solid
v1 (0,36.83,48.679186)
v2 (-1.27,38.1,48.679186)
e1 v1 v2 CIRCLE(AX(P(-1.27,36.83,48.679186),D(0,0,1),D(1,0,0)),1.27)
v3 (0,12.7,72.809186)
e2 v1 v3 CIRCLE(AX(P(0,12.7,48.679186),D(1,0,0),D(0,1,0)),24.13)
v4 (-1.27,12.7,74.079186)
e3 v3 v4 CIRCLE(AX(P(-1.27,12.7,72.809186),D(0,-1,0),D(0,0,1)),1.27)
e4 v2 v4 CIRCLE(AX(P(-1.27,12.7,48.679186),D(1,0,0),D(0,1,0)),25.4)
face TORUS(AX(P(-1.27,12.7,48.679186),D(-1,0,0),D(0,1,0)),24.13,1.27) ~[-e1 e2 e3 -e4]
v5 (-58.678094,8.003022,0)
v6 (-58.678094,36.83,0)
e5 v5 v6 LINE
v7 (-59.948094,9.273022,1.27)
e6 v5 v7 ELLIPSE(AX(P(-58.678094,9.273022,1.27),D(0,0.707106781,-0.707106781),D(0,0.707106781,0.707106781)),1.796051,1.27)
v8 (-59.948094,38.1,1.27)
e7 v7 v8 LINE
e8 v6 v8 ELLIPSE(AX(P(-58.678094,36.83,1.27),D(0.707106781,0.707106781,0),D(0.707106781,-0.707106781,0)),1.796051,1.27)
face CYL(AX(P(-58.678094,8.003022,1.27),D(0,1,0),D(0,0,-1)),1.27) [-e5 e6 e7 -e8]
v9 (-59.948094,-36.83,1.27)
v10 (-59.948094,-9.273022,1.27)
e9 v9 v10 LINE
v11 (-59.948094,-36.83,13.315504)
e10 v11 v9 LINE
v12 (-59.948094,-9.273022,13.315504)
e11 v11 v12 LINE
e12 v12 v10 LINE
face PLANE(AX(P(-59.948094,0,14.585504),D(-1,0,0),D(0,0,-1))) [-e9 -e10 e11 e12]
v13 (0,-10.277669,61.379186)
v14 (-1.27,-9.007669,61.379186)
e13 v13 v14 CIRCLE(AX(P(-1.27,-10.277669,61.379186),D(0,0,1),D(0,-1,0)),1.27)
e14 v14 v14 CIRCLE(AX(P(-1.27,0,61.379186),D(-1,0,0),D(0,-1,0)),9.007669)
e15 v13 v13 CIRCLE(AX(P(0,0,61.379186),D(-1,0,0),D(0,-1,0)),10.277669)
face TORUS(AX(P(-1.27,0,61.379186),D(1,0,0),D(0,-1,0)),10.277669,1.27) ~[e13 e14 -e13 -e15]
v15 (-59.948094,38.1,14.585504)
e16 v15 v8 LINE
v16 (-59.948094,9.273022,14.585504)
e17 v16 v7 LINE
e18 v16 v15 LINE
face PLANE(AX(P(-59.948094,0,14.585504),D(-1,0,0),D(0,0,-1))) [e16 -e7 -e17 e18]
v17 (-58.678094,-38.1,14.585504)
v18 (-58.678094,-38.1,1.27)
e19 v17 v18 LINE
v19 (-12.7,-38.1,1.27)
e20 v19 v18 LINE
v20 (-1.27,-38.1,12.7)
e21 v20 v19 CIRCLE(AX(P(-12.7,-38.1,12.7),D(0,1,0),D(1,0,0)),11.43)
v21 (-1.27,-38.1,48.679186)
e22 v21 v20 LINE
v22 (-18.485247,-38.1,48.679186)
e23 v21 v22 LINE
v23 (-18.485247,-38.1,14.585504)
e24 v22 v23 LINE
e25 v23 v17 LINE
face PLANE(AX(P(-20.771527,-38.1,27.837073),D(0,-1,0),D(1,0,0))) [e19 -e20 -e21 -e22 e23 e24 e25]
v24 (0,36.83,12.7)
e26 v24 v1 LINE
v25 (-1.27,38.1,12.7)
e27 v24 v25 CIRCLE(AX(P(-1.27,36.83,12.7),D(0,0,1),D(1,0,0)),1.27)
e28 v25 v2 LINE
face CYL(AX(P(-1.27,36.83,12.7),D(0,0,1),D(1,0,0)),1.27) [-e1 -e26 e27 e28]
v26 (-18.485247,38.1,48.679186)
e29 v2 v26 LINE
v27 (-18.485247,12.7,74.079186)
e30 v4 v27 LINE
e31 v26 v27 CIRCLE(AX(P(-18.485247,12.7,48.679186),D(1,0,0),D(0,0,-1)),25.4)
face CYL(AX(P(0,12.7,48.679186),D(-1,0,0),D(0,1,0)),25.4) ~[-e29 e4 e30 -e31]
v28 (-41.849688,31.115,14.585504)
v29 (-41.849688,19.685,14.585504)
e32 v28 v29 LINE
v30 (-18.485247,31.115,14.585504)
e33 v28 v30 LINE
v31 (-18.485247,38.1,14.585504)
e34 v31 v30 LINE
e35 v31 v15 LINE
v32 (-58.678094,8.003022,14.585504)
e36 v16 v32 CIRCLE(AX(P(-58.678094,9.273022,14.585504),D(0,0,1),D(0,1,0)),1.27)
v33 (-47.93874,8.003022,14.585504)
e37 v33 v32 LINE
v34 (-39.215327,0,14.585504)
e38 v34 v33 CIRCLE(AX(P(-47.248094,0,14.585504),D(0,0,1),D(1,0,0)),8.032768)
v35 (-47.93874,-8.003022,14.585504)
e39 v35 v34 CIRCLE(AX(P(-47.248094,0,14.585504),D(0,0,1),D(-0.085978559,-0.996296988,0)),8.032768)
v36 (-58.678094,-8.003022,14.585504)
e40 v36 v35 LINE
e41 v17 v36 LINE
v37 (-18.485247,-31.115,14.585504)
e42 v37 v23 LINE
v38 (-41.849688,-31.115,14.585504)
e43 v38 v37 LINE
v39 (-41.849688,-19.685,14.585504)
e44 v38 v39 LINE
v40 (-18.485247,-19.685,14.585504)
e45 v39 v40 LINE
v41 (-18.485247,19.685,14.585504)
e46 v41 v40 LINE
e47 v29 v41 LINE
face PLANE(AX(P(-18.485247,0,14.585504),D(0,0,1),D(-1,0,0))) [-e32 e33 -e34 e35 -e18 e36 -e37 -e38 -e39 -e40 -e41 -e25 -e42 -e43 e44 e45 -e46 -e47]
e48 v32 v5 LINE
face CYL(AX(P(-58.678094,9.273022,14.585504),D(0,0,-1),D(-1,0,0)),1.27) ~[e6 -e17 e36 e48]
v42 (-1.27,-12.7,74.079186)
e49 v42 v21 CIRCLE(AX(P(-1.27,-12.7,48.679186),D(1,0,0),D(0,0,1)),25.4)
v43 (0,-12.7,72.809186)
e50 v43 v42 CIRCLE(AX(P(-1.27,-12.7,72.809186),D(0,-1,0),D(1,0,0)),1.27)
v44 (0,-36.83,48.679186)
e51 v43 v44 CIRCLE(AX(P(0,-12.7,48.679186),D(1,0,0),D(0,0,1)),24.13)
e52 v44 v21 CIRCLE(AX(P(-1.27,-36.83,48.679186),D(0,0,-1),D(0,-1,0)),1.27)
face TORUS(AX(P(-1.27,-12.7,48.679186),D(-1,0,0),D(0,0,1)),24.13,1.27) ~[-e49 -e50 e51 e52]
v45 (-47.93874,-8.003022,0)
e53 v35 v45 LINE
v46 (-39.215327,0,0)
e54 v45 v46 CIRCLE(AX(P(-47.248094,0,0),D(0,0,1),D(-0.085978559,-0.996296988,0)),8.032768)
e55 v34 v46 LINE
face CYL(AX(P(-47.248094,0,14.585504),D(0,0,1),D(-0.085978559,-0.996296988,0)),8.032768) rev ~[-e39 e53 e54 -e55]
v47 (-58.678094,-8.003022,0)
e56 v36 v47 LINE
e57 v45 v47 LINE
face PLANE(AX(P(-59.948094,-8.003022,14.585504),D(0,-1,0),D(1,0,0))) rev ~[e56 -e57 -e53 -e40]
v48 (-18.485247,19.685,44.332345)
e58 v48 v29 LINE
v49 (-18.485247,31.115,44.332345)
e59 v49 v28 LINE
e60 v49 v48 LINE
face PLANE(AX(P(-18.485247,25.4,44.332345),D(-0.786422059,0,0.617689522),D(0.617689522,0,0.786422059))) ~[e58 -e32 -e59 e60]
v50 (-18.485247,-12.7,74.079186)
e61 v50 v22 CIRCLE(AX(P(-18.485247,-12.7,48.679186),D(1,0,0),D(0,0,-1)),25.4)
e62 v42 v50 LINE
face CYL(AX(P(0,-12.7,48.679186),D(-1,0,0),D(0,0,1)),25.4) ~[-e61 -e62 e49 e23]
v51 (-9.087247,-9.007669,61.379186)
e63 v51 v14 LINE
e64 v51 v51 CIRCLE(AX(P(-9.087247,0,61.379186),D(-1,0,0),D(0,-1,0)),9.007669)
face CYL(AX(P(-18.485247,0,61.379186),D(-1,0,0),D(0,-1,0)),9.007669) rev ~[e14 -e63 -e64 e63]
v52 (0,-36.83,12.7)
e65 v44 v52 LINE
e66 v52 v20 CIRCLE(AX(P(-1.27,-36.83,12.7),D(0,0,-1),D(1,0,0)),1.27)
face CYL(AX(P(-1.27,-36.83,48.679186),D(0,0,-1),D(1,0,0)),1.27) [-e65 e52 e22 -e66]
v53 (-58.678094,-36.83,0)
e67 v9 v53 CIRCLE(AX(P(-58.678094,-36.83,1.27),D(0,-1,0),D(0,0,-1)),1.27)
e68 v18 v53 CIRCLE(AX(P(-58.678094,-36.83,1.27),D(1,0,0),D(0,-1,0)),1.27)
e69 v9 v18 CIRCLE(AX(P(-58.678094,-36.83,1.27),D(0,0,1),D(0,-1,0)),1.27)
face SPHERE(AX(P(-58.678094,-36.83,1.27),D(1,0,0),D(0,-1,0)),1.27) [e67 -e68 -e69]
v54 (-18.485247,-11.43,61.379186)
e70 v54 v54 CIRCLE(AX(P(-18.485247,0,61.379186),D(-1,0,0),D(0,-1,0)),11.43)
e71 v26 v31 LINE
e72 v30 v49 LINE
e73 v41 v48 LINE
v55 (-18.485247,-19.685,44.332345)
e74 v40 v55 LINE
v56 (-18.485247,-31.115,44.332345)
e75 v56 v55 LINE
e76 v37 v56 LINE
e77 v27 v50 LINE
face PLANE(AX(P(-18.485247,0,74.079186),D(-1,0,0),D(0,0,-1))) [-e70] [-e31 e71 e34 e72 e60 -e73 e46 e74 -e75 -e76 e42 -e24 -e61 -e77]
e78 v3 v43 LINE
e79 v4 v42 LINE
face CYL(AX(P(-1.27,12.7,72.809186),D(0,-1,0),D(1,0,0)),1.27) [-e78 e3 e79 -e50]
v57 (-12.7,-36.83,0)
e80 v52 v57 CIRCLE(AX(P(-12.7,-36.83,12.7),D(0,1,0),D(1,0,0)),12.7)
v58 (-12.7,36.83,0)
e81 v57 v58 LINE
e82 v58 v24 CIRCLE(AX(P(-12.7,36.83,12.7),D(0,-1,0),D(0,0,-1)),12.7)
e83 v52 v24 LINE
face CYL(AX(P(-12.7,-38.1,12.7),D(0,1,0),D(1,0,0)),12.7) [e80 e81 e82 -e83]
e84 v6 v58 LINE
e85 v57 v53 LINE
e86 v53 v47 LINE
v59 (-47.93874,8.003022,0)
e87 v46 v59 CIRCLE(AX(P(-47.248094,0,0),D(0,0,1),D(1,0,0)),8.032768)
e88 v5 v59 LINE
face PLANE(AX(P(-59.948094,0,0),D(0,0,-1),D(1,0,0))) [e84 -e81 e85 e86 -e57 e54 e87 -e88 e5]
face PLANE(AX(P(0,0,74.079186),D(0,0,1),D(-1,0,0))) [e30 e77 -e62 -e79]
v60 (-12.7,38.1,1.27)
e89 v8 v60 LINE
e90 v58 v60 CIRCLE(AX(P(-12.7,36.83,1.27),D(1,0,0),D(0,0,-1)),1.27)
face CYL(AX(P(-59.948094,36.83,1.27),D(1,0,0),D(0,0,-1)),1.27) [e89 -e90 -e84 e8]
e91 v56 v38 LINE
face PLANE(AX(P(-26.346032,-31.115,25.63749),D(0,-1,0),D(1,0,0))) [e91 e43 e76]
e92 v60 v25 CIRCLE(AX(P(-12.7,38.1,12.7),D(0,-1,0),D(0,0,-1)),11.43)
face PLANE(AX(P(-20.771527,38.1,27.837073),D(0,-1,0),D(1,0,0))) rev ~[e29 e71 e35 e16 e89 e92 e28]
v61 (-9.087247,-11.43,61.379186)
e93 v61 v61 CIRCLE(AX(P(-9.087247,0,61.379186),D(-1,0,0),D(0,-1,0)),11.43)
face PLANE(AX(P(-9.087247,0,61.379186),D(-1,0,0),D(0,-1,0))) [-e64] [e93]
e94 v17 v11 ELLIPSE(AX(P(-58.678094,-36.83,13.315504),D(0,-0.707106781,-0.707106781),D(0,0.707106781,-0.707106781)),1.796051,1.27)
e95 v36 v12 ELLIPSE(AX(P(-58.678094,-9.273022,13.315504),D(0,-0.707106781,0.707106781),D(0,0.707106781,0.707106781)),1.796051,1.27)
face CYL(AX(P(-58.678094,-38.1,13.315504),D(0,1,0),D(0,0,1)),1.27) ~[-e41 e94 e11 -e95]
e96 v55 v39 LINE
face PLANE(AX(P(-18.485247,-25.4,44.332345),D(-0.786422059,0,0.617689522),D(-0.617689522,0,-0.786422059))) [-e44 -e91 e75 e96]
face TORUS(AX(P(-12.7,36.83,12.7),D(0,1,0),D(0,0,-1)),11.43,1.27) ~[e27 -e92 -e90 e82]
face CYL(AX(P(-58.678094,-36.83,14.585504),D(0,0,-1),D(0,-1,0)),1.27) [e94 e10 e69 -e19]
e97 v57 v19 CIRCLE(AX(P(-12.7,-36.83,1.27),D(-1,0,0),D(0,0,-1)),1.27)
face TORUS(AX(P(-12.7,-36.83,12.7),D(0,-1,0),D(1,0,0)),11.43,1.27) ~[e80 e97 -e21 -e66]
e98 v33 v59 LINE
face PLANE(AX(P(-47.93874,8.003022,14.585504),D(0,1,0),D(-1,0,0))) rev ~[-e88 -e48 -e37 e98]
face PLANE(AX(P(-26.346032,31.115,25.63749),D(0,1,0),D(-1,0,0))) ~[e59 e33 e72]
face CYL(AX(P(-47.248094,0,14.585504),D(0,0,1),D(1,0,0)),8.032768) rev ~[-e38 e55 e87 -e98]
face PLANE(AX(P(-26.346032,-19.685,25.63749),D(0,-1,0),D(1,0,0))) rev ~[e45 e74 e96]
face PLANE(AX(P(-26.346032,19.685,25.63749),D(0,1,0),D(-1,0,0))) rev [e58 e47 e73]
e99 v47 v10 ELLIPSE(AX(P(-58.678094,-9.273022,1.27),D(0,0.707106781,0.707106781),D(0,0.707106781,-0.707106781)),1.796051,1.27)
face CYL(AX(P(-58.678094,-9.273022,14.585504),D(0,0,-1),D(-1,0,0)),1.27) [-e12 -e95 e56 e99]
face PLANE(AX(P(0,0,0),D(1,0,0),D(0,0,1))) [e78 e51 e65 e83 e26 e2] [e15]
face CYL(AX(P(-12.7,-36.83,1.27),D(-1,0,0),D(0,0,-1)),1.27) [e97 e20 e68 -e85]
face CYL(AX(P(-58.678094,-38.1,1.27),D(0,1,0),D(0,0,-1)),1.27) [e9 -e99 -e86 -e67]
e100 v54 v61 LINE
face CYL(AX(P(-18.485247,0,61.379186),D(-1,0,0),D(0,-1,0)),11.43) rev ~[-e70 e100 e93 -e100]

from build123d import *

# Parameters (mm, degrees)
F1_DEPTH  = 38.1
F2_R      = 9.0076691871
F3_DEPTH  = 18.4852466609
F4_R      = 11.43
F4_R_2    = 9.0076691871
F6_DEPTH  = 9.398
F7_DEPTH  = 25.4
F10_DEPTH = 5.715
F12_R     = 25.4
F13_R     = 12.7
F14_R     = 1.27


# Not quite as in the source:
# - a pattern or mirror of a feature is missing from the dataset's text; its kind, count and spacing are read off the source's solid


with BuildPart() as f1:
    # F0 (on Front) → F1 (new body, symmetric)
    with BuildSketch(Plane.XZ):
        Polygon((0, 0), (0, 74.0791857243), (-18.4852466609, 74.0791857243), (-18.4852466609, 14.5855043083), (-59.9480941892, 14.5855043083), (-59.9480941892, 0), align=None)
    extrude(amount=F1_DEPTH, both=True)

    # F2 (on face) → F3 (cut, through all)
    with BuildSketch(Plane(origin=(-18.4852466609, 0, 0), x_dir=(0, -1, 0), z_dir=(-1, 0, 0))):
        with Locations((0, 61.3791857243)):
            Circle(F2_R)
    extrude(amount=-F3_DEPTH, mode=Mode.SUBTRACT)

    # F4 (on face) → F6 (cut)
    with BuildSketch(Plane(origin=(-18.4852466609, 0, 0), x_dir=(0, -1, 0), z_dir=(-1, 0, 0))):
        with Locations((0, 61.3791857243)):
            Circle(F4_R)
        with Locations((0, 61.3791857243)):
            Circle(F4_R_2, mode=Mode.SUBTRACT)
    extrude(amount=-F6_DEPTH, mode=Mode.SUBTRACT)

    # F5 (on face) → F7 (cut)
    with BuildSketch(Plane.XY.offset(14.5855043083)):
        with BuildLine():
            ThreePointArc((-47.9387399794, -8.003022201), (-55.2808618291, 0), (-47.9387399794, 8.003022201))
            Line((-47.9387399794, 8.003022201), (-59.9480941892, 8.003022201))
            Line((-59.9480941892, 8.003022201), (-59.9480941892, -8.003022201))
            Line((-59.9480941892, -8.003022201), (-47.9387399794, -8.003022201))
        make_face()
        with BuildLine():
            ThreePointArc((-47.9387399794, -8.003022201), (-41.8177369816, -5.9191702591), (-39.2153265492, 0))
            ThreePointArc((-39.2153265492, 0), (-41.8177369816, 5.9191702591), (-47.9387399794, 8.003022201))
            ThreePointArc((-47.9387399794, 8.003022201), (-55.2808618291, 0), (-47.9387399794, -8.003022201))
        make_face()
    extrude(amount=-F7_DEPTH, mode=Mode.SUBTRACT)

    # F9 (on offset) → F10 (join, symmetric)
    with BuildSketch(Plane.XZ.offset(25.4)):
        Polygon((-41.8496876955, 14.5855043083), (-18.4852466609, 14.5855043083), (-18.4852466609, 44.3323450163), align=None)
    f10 = extrude(amount=F10_DEPTH, both=True)

    # F10_copies: F10 across plane
    add(f10.mirror(Plane.ZX))

    # F12
    f12_edges = [f1.edges().sort_by_distance(p)[0] for p in [
        (-9.242623, 38.1, 74.079186),
        (-9.242623, -38.1, 74.079186),
    ]]
    fillet(f12_edges, radius=F12_R)

    # F13
    f13_edges = [f1.edges().sort_by_distance(p)[0] for p in [
        (0, 0, 0),
    ]]
    fillet(f13_edges, radius=F13_R)

    # F14
    f14_edges = [f1.edges().sort_by_distance(p)[0] for p in [
        (0, 38.1, 30.689593),
        (0, 0, 12.7),
        (0, 30.660512, 66.639698),
        (0, -38.1, 30.689593),
        (0, 0, 74.079186),
        (0, -30.660512, 66.639698),
        (0, 9.007669, 61.379186),
        (-59.948094, 23.051511, 0),
        (-3.719744, 38.1, 3.719744),
        (-36.324047, 38.1, 0),
        (-3.719744, -38.1, 3.719744),
        (-36.324047, -38.1, 0),
        (-59.948094, -38.1, 7.292752),
        (-59.948094, -23.051511, 0),
        (-59.948094, 8.003022, 7.292752),
        (-59.948094, -23.051511, 14.585504),
        (-59.948094, -8.003022, 7.292752),
    ]]
    fillet(f14_edges, radius=F14_R)


solid = f1.part
